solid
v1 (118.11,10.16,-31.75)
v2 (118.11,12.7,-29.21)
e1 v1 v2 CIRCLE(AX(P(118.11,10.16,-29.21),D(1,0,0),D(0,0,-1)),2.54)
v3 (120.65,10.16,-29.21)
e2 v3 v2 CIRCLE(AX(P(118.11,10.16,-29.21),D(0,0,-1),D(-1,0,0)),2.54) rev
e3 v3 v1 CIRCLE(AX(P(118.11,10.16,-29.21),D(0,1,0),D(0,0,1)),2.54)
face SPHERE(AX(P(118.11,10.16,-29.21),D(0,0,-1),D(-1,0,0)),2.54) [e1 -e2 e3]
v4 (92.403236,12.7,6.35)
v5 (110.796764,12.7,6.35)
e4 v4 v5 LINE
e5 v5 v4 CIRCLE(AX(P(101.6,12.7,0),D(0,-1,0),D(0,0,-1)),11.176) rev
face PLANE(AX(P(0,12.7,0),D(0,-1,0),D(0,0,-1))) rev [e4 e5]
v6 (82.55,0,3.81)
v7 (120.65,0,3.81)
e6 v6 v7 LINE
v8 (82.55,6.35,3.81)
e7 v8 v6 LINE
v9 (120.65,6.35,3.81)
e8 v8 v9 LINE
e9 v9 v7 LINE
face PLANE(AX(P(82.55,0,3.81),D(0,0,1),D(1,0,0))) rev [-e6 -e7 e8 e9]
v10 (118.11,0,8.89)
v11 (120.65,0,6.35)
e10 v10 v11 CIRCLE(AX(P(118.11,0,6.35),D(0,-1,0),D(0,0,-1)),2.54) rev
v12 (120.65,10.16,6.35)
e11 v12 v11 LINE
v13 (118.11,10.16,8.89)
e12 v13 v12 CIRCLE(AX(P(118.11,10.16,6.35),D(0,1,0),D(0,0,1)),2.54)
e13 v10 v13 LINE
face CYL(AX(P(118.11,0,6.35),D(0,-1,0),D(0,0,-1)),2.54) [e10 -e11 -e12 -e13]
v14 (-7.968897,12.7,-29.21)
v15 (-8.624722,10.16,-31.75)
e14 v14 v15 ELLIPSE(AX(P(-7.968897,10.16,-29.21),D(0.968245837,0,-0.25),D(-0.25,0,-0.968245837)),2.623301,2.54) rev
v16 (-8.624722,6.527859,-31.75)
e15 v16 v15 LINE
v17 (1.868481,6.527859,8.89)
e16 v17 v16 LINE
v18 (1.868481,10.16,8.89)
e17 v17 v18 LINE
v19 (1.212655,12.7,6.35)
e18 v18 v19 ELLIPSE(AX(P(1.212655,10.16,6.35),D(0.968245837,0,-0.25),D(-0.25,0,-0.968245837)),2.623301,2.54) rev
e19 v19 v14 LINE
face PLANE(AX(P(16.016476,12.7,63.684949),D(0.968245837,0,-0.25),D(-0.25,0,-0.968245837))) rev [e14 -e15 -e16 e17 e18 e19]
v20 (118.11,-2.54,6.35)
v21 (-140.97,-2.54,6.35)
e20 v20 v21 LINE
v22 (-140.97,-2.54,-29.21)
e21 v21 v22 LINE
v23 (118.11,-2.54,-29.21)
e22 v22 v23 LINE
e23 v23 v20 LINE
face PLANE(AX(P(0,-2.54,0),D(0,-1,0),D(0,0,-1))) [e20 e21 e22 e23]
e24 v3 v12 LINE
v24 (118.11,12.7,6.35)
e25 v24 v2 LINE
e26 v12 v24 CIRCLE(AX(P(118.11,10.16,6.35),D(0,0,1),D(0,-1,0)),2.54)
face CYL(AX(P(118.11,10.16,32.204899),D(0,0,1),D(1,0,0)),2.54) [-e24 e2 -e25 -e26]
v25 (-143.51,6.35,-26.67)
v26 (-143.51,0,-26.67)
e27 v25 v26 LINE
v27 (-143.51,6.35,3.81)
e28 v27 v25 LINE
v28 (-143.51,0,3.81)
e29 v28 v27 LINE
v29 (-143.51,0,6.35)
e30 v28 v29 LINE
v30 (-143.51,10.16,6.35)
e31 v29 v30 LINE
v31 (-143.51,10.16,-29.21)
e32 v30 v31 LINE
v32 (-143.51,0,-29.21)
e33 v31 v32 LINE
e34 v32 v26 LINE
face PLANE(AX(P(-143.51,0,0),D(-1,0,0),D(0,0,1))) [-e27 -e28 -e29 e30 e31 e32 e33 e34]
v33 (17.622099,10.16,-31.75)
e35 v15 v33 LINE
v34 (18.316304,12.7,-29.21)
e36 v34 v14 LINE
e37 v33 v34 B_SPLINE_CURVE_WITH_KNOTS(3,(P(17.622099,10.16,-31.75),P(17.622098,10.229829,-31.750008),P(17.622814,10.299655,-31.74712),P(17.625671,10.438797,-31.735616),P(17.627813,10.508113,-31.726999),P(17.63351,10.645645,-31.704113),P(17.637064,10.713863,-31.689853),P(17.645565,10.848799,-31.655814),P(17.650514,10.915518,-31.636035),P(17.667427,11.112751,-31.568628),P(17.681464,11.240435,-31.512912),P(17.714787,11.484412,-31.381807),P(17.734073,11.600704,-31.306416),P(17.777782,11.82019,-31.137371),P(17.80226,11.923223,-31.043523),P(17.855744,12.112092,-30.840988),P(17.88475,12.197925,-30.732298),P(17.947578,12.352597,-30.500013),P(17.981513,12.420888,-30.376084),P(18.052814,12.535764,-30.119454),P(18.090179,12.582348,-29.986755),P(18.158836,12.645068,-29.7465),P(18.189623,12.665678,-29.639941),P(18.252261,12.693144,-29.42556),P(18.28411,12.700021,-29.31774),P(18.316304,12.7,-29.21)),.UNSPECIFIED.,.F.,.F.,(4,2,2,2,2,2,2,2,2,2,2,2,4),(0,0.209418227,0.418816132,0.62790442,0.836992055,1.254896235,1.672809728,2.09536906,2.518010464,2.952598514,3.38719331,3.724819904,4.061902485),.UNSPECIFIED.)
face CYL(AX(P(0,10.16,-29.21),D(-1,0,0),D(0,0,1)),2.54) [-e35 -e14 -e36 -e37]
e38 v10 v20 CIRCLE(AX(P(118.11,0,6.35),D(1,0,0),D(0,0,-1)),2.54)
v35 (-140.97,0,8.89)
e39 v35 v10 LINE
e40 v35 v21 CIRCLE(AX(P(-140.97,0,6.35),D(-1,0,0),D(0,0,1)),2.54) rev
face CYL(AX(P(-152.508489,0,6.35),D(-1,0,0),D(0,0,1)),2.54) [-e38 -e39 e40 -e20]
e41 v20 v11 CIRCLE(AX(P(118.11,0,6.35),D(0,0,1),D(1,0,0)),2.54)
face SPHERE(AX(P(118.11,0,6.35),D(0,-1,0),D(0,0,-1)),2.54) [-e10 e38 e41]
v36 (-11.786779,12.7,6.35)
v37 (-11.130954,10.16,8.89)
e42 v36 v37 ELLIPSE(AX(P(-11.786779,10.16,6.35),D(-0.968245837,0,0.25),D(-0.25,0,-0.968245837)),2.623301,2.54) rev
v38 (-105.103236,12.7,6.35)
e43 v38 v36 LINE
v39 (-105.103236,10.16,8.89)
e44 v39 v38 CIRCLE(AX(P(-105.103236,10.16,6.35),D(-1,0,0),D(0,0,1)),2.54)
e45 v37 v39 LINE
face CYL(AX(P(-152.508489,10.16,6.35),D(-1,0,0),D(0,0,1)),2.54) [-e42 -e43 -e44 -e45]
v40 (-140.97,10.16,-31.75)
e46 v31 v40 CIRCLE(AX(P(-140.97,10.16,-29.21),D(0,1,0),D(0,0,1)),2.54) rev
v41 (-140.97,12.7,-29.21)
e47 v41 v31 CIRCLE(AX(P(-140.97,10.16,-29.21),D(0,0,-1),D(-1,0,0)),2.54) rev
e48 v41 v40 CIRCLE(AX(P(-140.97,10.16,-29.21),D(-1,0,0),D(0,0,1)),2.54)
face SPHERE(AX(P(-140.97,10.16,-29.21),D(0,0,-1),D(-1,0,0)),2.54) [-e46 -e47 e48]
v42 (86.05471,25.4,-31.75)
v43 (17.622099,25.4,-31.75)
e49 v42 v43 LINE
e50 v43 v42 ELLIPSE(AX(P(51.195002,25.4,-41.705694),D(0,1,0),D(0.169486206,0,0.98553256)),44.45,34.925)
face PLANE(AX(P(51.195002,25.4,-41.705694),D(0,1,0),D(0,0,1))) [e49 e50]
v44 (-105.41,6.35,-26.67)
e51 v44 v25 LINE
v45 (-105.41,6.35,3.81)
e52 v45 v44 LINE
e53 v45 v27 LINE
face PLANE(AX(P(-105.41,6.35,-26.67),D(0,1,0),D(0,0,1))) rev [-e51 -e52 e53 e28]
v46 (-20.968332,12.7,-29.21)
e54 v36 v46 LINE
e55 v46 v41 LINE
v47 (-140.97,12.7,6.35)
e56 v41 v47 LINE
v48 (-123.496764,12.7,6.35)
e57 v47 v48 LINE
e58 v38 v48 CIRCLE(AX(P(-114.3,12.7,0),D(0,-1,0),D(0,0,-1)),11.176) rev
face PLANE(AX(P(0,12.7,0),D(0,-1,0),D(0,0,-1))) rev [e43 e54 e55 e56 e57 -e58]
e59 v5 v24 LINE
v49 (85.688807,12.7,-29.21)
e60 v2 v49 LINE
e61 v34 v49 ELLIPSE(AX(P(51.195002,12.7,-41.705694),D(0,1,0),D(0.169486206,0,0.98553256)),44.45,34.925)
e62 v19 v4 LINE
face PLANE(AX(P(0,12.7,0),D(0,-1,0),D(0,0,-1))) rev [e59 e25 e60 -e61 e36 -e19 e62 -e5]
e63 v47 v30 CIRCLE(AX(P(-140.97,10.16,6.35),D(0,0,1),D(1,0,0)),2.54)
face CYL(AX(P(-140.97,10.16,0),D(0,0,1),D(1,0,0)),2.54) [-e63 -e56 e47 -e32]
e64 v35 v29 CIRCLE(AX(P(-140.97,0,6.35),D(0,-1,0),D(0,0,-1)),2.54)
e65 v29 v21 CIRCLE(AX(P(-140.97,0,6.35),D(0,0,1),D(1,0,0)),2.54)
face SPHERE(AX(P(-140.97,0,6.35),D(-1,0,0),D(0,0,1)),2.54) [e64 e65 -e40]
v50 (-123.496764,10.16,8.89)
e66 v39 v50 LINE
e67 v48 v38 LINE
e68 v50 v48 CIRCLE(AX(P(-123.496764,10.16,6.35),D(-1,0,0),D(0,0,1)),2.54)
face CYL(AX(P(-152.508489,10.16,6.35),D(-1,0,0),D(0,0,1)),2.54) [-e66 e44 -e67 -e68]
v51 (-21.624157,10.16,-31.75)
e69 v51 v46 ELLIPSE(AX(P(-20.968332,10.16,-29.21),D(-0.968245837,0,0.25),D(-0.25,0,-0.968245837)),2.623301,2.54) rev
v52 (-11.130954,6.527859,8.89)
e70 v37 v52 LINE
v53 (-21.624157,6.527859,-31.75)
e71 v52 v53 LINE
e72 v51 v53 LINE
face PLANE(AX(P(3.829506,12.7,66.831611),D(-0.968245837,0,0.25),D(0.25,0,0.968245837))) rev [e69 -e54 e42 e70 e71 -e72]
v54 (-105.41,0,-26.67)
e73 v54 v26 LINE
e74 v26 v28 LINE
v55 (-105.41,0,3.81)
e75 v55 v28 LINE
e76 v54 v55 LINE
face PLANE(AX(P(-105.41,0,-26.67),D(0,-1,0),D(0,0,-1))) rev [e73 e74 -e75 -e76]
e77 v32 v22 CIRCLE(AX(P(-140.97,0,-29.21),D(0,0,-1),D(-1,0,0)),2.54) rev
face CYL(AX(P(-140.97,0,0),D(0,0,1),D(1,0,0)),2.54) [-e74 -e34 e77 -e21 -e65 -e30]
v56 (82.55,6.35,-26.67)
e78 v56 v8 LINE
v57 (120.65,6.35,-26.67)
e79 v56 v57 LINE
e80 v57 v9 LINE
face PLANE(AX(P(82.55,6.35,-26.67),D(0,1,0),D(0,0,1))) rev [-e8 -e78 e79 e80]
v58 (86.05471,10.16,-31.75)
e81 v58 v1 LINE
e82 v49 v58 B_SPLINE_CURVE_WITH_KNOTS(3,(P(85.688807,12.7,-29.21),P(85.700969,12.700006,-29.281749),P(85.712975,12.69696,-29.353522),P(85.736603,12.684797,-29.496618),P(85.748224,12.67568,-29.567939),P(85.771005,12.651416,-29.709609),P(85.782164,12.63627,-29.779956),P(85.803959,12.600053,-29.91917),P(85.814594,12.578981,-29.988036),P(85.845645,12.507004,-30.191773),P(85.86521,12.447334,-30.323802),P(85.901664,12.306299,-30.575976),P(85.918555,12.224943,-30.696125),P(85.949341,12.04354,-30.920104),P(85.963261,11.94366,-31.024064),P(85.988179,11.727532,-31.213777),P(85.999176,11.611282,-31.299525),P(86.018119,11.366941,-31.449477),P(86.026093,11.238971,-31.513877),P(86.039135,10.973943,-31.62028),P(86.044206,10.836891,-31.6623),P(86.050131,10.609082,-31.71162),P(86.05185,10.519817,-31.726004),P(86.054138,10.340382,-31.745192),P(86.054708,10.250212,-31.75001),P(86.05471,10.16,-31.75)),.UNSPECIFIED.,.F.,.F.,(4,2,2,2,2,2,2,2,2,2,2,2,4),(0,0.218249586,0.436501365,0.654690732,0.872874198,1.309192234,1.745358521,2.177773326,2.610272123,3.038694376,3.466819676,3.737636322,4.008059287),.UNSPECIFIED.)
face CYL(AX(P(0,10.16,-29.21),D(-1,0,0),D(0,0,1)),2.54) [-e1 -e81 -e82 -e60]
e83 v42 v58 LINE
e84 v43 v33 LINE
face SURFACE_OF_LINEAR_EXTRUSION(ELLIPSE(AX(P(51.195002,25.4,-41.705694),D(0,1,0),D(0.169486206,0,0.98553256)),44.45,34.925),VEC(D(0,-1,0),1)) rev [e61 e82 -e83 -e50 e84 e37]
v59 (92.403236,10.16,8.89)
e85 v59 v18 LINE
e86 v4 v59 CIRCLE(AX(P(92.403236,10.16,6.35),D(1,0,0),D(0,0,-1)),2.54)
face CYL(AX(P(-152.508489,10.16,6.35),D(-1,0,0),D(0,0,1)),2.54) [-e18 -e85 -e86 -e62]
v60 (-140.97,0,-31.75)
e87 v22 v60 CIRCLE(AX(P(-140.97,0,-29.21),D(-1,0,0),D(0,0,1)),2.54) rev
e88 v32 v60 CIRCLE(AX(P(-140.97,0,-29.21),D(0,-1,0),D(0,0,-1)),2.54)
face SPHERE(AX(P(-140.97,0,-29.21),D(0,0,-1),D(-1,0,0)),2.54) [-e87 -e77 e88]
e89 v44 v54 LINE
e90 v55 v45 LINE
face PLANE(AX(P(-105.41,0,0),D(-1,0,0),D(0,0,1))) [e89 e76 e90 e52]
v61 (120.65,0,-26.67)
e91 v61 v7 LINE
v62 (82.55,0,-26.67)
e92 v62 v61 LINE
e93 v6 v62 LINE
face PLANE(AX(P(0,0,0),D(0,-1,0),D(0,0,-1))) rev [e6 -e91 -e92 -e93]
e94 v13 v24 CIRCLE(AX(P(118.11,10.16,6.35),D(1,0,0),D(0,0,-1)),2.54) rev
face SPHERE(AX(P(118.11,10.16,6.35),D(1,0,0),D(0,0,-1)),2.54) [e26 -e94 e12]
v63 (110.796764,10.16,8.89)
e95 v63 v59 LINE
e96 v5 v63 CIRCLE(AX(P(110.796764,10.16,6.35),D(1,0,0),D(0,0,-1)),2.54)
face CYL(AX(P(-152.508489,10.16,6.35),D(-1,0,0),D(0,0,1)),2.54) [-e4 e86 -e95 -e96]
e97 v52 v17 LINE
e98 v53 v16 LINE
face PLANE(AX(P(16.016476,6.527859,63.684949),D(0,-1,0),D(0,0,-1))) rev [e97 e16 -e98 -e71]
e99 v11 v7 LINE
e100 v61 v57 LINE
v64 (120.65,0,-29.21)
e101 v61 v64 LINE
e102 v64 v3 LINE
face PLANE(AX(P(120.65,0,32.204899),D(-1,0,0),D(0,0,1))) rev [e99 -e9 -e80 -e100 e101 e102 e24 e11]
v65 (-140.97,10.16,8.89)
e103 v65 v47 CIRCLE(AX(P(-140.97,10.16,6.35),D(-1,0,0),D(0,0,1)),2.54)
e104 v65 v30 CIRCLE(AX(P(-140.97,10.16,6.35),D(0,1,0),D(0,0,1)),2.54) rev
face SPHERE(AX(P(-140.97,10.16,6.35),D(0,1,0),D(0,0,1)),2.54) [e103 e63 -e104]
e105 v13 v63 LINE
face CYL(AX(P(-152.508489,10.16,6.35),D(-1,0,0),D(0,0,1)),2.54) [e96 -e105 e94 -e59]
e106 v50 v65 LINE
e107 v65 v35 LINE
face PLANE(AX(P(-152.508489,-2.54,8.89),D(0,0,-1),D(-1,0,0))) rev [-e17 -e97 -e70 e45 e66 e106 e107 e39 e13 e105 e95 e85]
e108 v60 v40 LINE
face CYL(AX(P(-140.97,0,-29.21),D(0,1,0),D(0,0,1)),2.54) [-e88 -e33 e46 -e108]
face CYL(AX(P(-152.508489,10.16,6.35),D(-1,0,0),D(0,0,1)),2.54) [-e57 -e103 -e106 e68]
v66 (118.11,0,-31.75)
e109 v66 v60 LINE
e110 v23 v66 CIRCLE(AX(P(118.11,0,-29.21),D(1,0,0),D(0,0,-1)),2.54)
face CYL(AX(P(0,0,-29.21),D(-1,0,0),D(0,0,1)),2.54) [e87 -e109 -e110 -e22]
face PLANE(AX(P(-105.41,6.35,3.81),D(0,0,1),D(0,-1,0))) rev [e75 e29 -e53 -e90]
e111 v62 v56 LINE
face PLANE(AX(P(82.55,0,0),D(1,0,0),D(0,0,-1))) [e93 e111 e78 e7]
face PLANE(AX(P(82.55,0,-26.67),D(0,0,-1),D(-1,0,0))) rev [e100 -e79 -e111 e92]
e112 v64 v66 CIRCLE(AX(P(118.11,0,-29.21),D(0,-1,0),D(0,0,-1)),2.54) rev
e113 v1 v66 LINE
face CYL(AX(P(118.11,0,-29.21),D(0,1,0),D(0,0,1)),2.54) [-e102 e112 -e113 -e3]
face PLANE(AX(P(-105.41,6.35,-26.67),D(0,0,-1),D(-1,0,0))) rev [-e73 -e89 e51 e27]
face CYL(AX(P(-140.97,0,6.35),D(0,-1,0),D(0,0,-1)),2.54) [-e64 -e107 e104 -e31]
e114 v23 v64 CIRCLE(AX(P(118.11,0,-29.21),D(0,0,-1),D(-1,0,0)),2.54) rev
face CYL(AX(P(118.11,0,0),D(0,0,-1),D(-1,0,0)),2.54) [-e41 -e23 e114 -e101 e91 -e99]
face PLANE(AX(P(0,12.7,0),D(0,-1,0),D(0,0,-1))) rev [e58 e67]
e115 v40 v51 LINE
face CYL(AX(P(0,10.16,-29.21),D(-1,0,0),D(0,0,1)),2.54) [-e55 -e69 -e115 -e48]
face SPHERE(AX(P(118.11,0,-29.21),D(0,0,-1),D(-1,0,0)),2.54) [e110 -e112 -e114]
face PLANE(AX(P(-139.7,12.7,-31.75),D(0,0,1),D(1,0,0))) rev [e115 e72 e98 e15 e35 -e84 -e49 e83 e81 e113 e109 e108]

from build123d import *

# Parameters (mm, degrees)
SKETCH1_W               = 279.4
SKETCH1_H               = 63.5
BOSS_EXTRUDE1_DEPTH     = 12.7
BOSS_EXTRUDE2_DEPTH     = 50.8
SKETCH4_W               = 12.586648523787707
SKETCH4_H               = 6.172140988773259
CUT_EXTRUDE1_DEPTH      = 187.15064931818
CUT_EXTRUDE2_DEPTH      = 191.3909441326203
CUT_EXTRUDE2_DEPTH_BACK = 191.3909441326203
SKETCH5_W               = 77.64929915814443
SKETCH5_H               = 50.80000000000001
BOSS_EXTRUDE3_DEPTH     = 12.7
CUT_EXTRUDE4_DEPTH      = 57.15
CUT_EXTRUDE5_DEPTH      = 149.14020610558435
SKETCH23_W              = 260.35
SKETCH23_H              = 63.5
BOSS_EXTRUDE4_DEPTH     = 2.54
CUT_EXTRUDE6_DEPTH      = 149.37954115889764
SKETCH27_W              = 286.4591757611205
SKETCH27_H              = 45.03610752945451
CUT_EXTRUDE7_DEPTH      = 145.07085099474523
SKETCH31_W              = 40.63999999999999
SKETCH31_H              = 15.239999999999998
BOSS_EXTRUDE6_DEPTH     = 3.8099999999999996
CUT_EXTRUDE10_DEPTH     = 38.1
FILLET3_R               = 2.54


with BuildPart() as part:
    # Sketch1 → Boss-Extrude1 (new body)
    with BuildSketch(Plane(origin=(0, 0, 0), x_dir=(1, 0, 0), z_dir=(0, 1, 0))):
        Rectangle(SKETCH1_W, SKETCH1_H)
    extrude(amount=BOSS_EXTRUDE1_DEPTH)

    # Sketch2 → Boss-Extrude2 (add)
    with BuildSketch(Plane(origin=(0, 12.7, 0), x_dir=(1, 0, 0), z_dir=(0, 1, 0))):
        Polygon((-47.69999999999997, -21.749999999999986), (-28.33508326896288, -16.749999999999986), (-44.21008326896288, 44.733610621042764), (-63.57499999999998, 39.73361062104277), align=None)
        Polygon((8.514130017407421, 43.733610621042764), (24.389130017407417, -17.74999999999999), (43.7540467484445, -12.749999999999984), (27.879046748444473, 48.733610621042764), align=None)
    extrude(amount=BOSS_EXTRUDE2_DEPTH)

    # Sketch4 → Cut-Extrude1 (cut, through all)
    with BuildSketch(Plane(origin=(-13.591413263749278, 0, -52.63931722192361), x_dir=(-0.9682458365518543, 0, 0.24999999999999972), z_dir=(-0.24999999999999972, 0, -0.9682458365518543))):
        with Locations((6.706675646106144, 9.613929505613372)):
            Rectangle(SKETCH4_W, SKETCH4_H)
    extrude(amount=-CUT_EXTRUDE1_DEPTH, mode=Mode.SUBTRACT)

    # Sketch5 → Cut-Extrude2 (cut, two sides: drawn at the far end of the back side and taken through both)
    with BuildSketch(Plane(origin=(-30.618670005213612, 0, 7.905706600880859), x_dir=(-0.2500000000000001, 0, -0.9682458365518543), z_dir=(0.9682458365518541, 0, -0.25000000000000006)).offset(-CUT_EXTRUDE2_DEPTH_BACK)):
        with Locations((15.541003475924965, 38.1)):
            Rectangle(SKETCH5_W, SKETCH5_H)
    extrude(amount=CUT_EXTRUDE2_DEPTH + CUT_EXTRUDE2_DEPTH_BACK, mode=Mode.SUBTRACT)

    # Sketch6 → Boss-Extrude3 (add)
    with BuildSketch(Plane(origin=(0, 12.7, 0), x_dir=(1, 0, 0), z_dir=(0, 1, 0))):
        with BuildLine():
            Line((16.77527777661138, 35.78638852333846), (85.61472706482589, 47.625000000000014))
            add(Edge.make_bspline(
                [(16.77527777661138, 35.78638852333846), (24.308939625396, -8.020533750979865), (58.728664269503255, -2.101228012649095), (93.14838891361052, 3.8180777256816754), (85.61472706482589, 47.625000000000014)],
                knots=[4.71238898038469, 4.71238898038469, 4.71238898038469, 6.283185307179586, 6.283185307179586, 7.853981633974483, 7.853981633974483, 7.853981633974483], degree=2, weights=[1, 0.7071067811865476, 1, 0.7071067811865476, 1]))
        make_face()
    extrude(amount=BOSS_EXTRUDE3_DEPTH)

    # Sketch17 → Cut-Extrude4 (cut)
    with BuildSketch(Plane(origin=(139.70000000000002, 0, 0), x_dir=(0, 0, -1), z_dir=(1, 0, 0))):
        Polygon((26.670000000000012, -1.52e-15), (-3.80999999999998, -5.2e-15), (-3.80999999999998, 6.349999999999993), (26.670000000000012, 6.349999999999996), align=None)
    extrude(amount=-CUT_EXTRUDE4_DEPTH, mode=Mode.SUBTRACT)

    # Sketch22 → Cut-Extrude5 (cut, through all)
    with BuildSketch(Plane(origin=(0, 12.7, 0), x_dir=(1, 0, 0), z_dir=(0, 1, 0))):
        Polygon((139.70000000000002, -32.204899371851745), (120.65000000000002, -32.204899371851745), (120.65000000000002, 31.750000000000014), (139.70000000000005, 31.750000000000014), align=None)
    extrude(amount=-CUT_EXTRUDE5_DEPTH, mode=Mode.SUBTRACT)

    # Sketch23 → Boss-Extrude4 (add)
    with BuildSketch(Plane.XZ):
        with Locations((-9.524999999999963, -1.421e-14)):
            Rectangle(SKETCH23_W, SKETCH23_H)
    extrude(amount=BOSS_EXTRUDE4_DEPTH)

    # Sketch25 → Cut-Extrude6 (cut, through all)
    with BuildSketch(Plane.XZ.offset(-12.7)):
        with BuildLine():
            Line((86.05470968261828, -31.750000000000014), (17.622098670079023, -31.750000000000014))
            add(Edge.make_bspline(
                [(17.622098670079023, -31.750000000000014), (17.12530185096651, -33.75105992388856), (16.77527777661137, -35.78638852333846)],
                knots=[1.4779404098519116, 1.4779404098519116, 1.4779404098519116, 1.5707963267948968, 1.5707963267948968, 1.5707963267948968], degree=2, weights=[1, 0.9989224159229568, 1]))
            Line((16.77527777661137, -35.78638852333846), (85.6147270648259, -47.62500000000003))
            add(Edge.make_bspline(
                [(85.6147270648259, -47.62500000000003), (86.99136168467464, -39.620111142189245), (86.05470968261828, -31.750000000000014)],
                knots=[4.71238898038469, 4.71238898038469, 4.71238898038469, 5.073863183068598, 5.073863183068598, 5.073863183068598], degree=2, weights=[1, 0.9837114625910768, 1]))
        make_face()
    extrude(amount=-CUT_EXTRUDE6_DEPTH, mode=Mode.SUBTRACT)

    # Sketch27 → Cut-Extrude7 (cut, through all)
    with BuildSketch(Plane(origin=(0, 12.7, 0), x_dir=(1, 0, 0), z_dir=(0, 1, 0))):
        with Locations((-9.278901051751589, -31.408053764727235)):
            Rectangle(SKETCH27_W, SKETCH27_H)
    extrude(amount=-CUT_EXTRUDE7_DEPTH, mode=Mode.SUBTRACT)

    # Sketch31 → Boss-Extrude6 (add)
    with BuildSketch(Plane.ZY.offset(139.69999999999996)):
        with Locations((-11.430000000000017, 5.079999999999998)):
            Rectangle(SKETCH31_W, SKETCH31_H)
    extrude(amount=BOSS_EXTRUDE6_DEPTH)

    # Sketch32 → Cut-Extrude10 (cut)
    with BuildSketch(Plane.ZY.offset(143.50999999999996)):
        Polygon((-26.67000000000002, 6.35), (3.80999999999998, 6.35), (3.809999999999981, 0), (-26.67000000000002, 0), align=None)
    extrude(amount=-CUT_EXTRUDE10_DEPTH, mode=Mode.SUBTRACT)

    # Fillet3
    fillet3_edges = [part.edges().sort_by_distance(p)[0] for p in [
        (61.259240327968, 12.7, 8.889999999999981),
        (-77.32047702099145, 12.7, 8.889999999999983),
        (120.65000000000002, -2.54, -11.430000000000021),
        (-143.50999999999996, 5.079999999999999, 8.889999999999981),
        (-143.50999999999996, 5.08, -31.750000000000014),
        (120.65000000000002, 5.079999999999999, -31.750000000000014),
        (120.65000000000002, 5.08, 8.88999999999998),
        (-11.429999999999964, -2.54, -31.750000000000014),
        (-11.429999999999964, -2.54, 8.88999999999998),
        (-143.50999999999996, -2.54, -11.430000000000017),
        (120.65000000000002, 12.7, -11.430000000000014),
        (103.35235484130929, 12.7, -31.750000000000014),
        (4.49868822334534, 12.7, -31.750000000000014),
        (-143.50999999999996, 12.7, -11.430000000000016),
        (-82.56707846065376, 12.7, -31.750000000000014),
    ]]
    fillet(fillet3_edges, radius=FILLET3_R - 0.0001)  # a hair under: the kernel refuses the full size


solid = part.part
